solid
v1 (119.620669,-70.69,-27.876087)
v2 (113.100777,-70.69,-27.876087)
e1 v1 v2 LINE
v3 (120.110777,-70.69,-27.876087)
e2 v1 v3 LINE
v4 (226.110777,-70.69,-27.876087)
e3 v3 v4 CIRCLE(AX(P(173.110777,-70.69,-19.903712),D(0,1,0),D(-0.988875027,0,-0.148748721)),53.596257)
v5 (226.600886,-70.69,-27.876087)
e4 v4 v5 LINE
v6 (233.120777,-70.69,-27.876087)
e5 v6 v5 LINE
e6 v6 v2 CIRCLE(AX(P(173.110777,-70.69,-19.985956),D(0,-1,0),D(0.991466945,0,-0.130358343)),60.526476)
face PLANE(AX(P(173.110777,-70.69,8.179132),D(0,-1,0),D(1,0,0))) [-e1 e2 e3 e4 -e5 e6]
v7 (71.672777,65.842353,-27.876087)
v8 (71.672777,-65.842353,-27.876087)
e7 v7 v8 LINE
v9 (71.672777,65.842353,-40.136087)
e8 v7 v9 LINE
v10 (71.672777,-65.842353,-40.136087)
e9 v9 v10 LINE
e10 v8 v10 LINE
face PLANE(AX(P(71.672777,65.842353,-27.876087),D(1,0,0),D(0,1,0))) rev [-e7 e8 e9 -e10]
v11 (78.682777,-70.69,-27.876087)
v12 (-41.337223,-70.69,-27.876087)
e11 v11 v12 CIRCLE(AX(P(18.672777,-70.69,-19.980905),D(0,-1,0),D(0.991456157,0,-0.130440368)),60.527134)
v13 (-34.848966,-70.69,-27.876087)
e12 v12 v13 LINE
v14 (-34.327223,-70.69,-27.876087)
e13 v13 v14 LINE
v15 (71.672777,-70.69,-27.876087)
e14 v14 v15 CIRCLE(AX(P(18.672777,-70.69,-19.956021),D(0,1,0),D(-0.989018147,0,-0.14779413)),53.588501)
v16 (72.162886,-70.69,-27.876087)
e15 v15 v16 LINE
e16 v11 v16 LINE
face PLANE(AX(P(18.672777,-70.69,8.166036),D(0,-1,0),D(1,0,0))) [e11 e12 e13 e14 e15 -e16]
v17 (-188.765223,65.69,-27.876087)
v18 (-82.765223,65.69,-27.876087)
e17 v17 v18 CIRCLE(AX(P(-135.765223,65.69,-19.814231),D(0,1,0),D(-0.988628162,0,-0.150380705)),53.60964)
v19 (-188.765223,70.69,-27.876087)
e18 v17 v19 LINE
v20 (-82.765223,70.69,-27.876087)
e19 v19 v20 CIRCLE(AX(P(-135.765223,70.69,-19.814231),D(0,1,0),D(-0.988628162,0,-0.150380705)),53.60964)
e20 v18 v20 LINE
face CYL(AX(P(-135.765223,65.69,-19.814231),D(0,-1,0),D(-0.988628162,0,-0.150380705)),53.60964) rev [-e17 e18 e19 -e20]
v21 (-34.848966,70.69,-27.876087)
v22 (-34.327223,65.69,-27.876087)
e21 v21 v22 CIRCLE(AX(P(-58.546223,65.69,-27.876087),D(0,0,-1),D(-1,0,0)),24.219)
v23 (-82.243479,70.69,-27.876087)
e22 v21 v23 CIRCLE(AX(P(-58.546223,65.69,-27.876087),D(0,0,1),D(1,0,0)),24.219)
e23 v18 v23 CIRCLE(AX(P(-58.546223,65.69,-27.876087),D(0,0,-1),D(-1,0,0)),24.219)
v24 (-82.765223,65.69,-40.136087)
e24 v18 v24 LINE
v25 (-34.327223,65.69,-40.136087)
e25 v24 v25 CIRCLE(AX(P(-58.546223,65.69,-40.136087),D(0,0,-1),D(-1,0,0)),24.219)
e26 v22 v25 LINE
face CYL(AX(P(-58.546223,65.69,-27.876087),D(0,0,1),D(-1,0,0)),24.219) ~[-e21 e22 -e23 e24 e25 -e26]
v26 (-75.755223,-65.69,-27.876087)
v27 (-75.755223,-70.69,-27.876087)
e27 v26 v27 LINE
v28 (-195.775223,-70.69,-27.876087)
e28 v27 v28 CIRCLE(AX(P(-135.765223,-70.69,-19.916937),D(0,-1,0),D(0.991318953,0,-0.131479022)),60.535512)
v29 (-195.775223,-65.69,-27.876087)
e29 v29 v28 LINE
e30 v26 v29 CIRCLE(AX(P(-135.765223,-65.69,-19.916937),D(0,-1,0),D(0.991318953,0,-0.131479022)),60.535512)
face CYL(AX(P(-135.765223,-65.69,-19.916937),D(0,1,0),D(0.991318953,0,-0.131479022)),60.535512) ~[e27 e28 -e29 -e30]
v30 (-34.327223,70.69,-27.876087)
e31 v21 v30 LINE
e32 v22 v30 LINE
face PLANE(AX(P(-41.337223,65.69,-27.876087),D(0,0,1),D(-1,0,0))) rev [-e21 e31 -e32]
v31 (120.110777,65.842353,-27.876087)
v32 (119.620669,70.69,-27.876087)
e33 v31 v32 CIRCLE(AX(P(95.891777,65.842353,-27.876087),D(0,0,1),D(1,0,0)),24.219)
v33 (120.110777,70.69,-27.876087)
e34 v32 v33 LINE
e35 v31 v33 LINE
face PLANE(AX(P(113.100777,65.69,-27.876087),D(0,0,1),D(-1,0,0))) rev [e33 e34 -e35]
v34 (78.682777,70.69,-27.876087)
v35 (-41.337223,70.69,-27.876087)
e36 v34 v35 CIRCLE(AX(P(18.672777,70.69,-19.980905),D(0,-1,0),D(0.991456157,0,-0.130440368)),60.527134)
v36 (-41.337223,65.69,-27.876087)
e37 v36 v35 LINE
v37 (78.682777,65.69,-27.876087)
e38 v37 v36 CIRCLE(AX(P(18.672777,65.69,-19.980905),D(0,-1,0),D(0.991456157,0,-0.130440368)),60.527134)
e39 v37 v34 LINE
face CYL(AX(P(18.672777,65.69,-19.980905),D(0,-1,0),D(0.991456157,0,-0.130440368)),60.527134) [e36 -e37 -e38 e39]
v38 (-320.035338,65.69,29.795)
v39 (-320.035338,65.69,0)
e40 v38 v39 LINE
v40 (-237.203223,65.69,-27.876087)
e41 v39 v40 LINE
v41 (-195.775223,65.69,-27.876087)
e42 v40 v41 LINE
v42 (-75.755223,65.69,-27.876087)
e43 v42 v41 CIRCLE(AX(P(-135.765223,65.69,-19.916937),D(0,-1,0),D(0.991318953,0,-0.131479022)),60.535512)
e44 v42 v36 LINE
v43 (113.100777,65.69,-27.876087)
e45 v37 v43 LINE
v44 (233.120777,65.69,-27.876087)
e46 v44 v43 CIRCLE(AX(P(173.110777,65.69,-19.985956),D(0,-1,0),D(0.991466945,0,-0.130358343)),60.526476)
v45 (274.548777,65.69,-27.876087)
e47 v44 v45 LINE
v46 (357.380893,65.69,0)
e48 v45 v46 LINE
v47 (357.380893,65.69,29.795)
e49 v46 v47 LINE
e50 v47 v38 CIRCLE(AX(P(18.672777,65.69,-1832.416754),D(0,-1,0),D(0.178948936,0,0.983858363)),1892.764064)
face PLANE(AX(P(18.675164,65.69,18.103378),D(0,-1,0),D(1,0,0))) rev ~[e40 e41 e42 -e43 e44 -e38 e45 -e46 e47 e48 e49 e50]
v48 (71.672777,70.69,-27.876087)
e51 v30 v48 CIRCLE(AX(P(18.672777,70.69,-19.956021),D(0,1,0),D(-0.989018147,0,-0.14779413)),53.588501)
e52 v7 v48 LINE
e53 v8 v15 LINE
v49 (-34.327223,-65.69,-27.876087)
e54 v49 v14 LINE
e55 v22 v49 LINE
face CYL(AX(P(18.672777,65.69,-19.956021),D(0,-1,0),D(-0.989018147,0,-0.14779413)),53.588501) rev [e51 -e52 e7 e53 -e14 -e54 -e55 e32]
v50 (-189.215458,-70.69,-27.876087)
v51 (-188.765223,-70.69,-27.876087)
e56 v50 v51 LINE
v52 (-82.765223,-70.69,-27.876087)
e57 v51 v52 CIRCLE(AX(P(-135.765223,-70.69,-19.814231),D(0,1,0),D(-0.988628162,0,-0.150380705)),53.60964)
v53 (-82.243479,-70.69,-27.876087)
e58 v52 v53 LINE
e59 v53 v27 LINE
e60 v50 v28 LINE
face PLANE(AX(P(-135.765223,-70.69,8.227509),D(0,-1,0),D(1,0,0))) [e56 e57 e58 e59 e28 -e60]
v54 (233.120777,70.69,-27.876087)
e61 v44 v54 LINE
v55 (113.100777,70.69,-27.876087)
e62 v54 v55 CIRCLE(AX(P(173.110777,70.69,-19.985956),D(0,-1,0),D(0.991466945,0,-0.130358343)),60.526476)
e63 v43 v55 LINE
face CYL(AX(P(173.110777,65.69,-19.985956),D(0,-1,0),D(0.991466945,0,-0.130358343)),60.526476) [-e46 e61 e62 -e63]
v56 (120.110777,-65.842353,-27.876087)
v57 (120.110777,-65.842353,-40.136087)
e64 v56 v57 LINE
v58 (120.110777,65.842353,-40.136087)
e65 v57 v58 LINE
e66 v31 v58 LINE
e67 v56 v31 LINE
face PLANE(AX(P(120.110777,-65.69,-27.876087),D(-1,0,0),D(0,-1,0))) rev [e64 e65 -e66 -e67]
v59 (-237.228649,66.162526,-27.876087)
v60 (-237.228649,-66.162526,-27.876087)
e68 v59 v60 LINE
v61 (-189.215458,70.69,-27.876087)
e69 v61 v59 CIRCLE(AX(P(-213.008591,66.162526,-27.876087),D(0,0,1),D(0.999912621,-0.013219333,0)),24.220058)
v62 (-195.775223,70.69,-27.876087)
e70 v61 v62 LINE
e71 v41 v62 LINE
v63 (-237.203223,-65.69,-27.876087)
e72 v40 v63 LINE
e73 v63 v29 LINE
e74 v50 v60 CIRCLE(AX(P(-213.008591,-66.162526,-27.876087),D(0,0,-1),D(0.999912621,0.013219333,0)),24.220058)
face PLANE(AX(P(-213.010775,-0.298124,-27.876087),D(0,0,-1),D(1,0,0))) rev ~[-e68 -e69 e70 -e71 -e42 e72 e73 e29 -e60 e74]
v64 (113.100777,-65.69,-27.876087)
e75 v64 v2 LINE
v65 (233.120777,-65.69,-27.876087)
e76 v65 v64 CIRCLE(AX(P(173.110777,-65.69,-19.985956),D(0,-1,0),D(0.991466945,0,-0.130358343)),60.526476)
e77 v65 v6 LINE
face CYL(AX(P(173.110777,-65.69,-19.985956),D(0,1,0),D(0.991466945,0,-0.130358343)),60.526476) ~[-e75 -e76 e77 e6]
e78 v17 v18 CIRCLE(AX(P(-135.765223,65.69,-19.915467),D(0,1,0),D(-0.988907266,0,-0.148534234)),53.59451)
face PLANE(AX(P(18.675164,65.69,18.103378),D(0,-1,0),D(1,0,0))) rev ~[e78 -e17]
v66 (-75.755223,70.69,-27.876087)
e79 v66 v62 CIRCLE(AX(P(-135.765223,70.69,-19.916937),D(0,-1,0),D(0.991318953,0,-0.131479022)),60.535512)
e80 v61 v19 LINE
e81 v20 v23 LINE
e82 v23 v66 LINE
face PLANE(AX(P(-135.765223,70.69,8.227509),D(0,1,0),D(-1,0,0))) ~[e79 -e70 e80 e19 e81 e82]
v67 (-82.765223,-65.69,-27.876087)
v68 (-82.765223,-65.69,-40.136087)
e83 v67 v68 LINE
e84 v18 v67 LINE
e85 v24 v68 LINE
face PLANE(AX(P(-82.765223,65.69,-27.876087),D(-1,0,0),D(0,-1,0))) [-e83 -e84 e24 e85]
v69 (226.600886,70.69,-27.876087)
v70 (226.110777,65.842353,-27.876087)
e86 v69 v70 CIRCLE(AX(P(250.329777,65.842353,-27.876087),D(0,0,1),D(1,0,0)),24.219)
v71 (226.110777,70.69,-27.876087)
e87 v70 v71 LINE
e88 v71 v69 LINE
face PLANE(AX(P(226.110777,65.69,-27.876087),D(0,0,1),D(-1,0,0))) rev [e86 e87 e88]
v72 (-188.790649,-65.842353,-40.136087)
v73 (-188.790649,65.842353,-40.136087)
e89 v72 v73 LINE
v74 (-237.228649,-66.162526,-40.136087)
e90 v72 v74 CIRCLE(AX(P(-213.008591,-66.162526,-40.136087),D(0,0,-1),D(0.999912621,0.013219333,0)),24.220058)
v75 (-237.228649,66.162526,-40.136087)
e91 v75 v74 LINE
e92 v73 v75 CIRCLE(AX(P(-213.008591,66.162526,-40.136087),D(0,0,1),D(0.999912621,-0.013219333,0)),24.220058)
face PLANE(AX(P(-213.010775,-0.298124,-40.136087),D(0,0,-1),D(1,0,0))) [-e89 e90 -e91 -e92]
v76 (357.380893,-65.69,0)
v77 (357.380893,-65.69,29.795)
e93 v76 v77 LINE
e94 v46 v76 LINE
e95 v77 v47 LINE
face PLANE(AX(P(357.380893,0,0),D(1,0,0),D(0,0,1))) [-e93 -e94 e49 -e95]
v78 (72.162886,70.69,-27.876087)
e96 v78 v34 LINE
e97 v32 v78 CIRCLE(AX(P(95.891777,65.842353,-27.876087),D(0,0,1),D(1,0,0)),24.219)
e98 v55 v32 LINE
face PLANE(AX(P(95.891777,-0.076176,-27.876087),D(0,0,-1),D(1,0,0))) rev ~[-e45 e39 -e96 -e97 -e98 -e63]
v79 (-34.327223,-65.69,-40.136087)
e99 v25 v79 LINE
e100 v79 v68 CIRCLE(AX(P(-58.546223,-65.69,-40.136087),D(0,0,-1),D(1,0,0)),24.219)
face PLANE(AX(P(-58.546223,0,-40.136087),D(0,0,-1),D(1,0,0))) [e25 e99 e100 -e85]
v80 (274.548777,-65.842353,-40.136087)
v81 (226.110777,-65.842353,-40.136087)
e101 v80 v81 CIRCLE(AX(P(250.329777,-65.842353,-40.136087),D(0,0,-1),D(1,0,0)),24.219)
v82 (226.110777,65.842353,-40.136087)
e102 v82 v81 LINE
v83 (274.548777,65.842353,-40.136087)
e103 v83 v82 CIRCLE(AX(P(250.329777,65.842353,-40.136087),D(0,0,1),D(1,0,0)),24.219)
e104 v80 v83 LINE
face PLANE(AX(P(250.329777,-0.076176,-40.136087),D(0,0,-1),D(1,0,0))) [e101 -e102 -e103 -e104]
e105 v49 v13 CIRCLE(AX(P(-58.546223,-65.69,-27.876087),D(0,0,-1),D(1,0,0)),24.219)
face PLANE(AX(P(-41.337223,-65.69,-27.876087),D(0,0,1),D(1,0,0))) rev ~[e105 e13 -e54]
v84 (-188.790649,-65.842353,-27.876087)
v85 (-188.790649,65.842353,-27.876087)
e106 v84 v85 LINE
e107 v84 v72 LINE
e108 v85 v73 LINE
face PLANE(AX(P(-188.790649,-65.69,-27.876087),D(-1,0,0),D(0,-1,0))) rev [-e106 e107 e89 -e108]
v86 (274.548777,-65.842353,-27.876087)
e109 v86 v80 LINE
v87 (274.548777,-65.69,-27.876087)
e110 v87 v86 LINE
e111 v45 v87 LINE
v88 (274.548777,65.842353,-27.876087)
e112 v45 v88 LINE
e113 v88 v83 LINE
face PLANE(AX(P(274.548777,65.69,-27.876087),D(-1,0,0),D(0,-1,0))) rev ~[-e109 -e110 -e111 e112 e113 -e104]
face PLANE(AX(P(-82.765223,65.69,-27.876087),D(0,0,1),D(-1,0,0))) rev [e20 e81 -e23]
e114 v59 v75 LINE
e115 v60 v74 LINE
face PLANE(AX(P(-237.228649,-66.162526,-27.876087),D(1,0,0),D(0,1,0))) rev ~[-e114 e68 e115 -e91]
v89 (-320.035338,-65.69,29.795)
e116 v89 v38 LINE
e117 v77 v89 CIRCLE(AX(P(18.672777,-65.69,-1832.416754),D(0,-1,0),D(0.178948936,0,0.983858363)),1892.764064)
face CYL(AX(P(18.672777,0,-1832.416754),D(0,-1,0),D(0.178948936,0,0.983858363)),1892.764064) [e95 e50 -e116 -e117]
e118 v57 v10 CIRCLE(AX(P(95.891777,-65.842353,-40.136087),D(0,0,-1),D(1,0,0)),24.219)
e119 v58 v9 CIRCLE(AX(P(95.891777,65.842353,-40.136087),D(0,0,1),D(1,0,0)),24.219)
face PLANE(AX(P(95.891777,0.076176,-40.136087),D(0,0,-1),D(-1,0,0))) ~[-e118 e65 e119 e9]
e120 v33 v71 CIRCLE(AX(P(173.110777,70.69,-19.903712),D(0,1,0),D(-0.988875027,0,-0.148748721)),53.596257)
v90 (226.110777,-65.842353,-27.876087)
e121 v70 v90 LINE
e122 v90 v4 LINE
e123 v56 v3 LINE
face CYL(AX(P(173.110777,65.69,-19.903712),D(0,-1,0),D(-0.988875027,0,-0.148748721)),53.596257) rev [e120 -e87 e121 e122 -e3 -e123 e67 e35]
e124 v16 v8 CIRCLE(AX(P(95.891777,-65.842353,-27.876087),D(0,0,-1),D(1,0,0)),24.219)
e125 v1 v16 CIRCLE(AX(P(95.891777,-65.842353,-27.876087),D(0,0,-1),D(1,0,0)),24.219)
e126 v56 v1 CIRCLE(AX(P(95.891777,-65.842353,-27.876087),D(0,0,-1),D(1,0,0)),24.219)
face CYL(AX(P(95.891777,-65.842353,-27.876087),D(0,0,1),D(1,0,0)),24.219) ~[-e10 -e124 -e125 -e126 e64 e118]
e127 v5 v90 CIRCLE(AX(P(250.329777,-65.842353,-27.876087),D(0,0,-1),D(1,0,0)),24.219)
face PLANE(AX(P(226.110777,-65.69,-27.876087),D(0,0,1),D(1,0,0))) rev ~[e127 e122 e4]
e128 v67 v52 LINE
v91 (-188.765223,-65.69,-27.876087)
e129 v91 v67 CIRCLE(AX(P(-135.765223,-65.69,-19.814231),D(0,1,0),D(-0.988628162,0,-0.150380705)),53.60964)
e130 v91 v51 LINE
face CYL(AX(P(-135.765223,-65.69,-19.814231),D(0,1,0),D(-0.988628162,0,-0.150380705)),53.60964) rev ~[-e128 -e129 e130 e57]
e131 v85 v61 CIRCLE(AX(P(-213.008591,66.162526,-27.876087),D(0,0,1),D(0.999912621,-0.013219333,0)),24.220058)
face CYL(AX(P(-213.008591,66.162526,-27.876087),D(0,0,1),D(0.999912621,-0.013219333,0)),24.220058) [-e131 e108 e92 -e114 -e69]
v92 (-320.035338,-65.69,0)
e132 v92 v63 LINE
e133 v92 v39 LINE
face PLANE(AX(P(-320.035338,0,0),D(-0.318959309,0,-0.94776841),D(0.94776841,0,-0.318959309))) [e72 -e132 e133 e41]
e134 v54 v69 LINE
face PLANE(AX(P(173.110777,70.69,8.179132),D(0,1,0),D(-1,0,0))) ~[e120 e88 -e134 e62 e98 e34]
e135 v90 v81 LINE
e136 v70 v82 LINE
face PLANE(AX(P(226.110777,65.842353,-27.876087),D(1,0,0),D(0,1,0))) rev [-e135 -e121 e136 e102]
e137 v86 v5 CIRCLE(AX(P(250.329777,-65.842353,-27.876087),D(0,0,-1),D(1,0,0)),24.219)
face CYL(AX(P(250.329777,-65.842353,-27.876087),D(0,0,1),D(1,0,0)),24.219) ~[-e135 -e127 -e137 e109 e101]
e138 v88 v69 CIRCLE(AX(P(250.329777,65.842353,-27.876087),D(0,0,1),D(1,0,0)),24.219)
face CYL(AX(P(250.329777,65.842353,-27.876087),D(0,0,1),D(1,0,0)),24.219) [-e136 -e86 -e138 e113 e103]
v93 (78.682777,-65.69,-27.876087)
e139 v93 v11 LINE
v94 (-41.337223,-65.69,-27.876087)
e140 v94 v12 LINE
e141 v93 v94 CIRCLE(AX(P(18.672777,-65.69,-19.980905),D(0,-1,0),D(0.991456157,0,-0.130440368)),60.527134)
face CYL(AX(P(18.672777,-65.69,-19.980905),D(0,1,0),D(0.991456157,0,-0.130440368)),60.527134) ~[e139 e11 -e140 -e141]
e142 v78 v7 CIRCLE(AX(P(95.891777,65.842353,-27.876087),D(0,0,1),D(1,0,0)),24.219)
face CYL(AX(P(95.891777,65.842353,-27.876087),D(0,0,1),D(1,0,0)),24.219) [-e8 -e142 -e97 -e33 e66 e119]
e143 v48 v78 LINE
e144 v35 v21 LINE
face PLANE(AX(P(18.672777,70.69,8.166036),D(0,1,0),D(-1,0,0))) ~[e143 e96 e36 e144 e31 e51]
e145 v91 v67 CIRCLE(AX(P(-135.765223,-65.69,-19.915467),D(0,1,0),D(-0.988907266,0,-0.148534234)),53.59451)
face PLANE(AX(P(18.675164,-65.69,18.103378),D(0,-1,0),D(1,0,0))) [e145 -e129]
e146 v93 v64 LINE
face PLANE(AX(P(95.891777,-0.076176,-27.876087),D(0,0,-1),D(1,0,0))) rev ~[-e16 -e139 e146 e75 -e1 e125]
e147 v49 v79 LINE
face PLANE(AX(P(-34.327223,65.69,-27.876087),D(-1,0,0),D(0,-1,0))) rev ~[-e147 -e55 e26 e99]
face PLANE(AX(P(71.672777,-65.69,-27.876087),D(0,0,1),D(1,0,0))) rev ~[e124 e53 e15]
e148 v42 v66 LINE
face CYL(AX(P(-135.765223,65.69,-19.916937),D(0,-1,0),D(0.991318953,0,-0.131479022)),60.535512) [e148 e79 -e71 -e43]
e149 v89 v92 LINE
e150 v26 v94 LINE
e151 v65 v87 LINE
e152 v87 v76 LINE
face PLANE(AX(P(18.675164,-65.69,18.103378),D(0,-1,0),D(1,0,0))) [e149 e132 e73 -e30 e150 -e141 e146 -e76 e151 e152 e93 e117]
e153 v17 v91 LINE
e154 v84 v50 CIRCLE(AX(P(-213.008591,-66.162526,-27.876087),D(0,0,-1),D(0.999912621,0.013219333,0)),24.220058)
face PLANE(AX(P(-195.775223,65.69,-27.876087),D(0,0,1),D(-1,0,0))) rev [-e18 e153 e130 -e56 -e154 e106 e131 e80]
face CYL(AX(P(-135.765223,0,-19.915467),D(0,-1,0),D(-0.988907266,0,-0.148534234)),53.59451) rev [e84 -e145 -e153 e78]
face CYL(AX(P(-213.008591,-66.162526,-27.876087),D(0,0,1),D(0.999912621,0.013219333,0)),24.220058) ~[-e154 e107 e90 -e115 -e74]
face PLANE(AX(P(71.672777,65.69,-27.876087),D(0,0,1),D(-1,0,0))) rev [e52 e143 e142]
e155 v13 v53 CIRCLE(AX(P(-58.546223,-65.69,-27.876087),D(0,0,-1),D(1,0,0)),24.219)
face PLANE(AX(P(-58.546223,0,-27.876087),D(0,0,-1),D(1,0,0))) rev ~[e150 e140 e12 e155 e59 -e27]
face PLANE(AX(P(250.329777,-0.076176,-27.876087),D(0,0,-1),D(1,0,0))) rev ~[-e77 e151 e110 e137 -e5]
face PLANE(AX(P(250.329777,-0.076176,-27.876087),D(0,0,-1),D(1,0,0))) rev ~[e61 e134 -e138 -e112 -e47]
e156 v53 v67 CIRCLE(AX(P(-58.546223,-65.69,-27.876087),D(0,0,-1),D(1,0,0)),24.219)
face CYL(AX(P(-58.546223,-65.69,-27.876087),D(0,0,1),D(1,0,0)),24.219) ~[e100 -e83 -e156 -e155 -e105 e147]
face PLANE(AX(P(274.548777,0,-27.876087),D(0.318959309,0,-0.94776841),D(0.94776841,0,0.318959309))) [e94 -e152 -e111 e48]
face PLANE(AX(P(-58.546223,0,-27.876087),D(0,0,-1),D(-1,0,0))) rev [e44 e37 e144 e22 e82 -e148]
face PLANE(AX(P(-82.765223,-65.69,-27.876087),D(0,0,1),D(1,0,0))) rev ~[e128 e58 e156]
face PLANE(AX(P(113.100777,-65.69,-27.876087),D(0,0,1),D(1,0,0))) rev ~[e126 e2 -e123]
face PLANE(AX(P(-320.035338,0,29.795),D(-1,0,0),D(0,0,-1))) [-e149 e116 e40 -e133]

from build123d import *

# Parameters (mm, degrees)
F1_DEPTH = 65.69
F2_W     = 48.438
F2_H     = 131.38
F3_DEPTH = 12.26
F5_DEPTH = 5


# Not quite as in the source:
# - a feature names something its author has since deleted; it is built from what else it names


with BuildPart() as f1:
    # F0 (on Front) → F1 (new body, symmetric)
    with BuildSketch(Plane.XZ):
        with BuildLine():
            Line((-320.0353384018, 0), (-237.2032226722, -27.8760867547))
            Line((-237.2032226722, -27.8760867547), (-188.7652226722, -27.8760867547))
            ThreePointArc((-188.7652226722, -27.8760867547), (-135.7652226722, 33.6790422812), (-82.7652226722, -27.8760867547))
            Line((-82.7652226722, -27.8760867547), (-34.3272226722, -27.8760867547))
            ThreePointArc((-34.3272226722, -27.8760867547), (18.6727773278, 33.6324801702), (71.6727773278, -27.8760867547))
            Line((71.6727773278, -27.8760867547), (120.1107773278, -27.8760867547))
            ThreePointArc((120.1107773278, -27.8760867547), (173.1107773278, 33.6925448374), (226.1107773278, -27.8760867547))
            Line((226.1107773278, -27.8760867547), (274.5487773278, -27.8760867547))
            Line((274.5487773278, -27.8760867547), (357.3808930574, 0))
            Line((357.3808930574, 0), (357.3808930574, 29.795))
            ThreePointArc((357.3808930574, 29.795), (18.6727773278, 60.3473106454), (-320.0353384018, 29.795))
            Line((-320.0353384018, 29.795), (-320.0353384018, 0))
        make_face()
    extrude(amount=F1_DEPTH, both=True)

    # F2 (on face) → F3 (join)
    with BuildSketch(Plane(origin=(0, 0, -27.8760867547), x_dir=(1, 0, 0), z_dir=(0, 0, -1))):
        with BuildLine():
            ThreePointArc((-237.2286491756, -65.5376471925), (-213.0855863574, -89.7567669916), (-188.7906491756, -65.69))
            Line((-188.7906491756, -65.69), (-188.7906491756, 65.8423528075))
            ThreePointArc((-188.7906491756, 65.8423528075), (-212.8485010036, 90.3820549045), (-237.2286491756, 66.1625258279))
            Line((-237.2286491756, 66.1625258279), (-237.2286491756, -65.5376471925))
        make_face()
        with Locations((-58.5462226722, 0)):
            Rectangle(F2_W, F2_H)
        with BuildLine():
            Line((71.6727773278, 65.8423528075), (71.6727773278, -65.69))
            ThreePointArc((71.6727773278, -65.69), (95.8917773278, -89.909), (120.1107773278, -65.69))
            Line((120.1107773278, -65.69), (120.1107773278, 65.8423528075))
            ThreePointArc((120.1107773278, 65.8423528075), (95.8917773278, 90.0613528075), (71.6727773278, 65.8423528075))
        make_face()
        with BuildLine():
            Line((226.1107773278, 65.8423528075), (226.1107773278, -65.69))
            ThreePointArc((226.1107773278, -65.69), (250.3297773278, -89.909), (274.5487773278, -65.69))
            Line((274.5487773278, -65.69), (274.5487773278, 65.8423528075))
            ThreePointArc((274.5487773278, 65.8423528075), (250.3297773278, 90.0613528075), (226.1107773278, 65.8423528075))
        make_face()
        with BuildLine():
            Line((-34.3272226722, -65.69), (-82.7652226722, -65.69))
            ThreePointArc((-82.7652226722, -65.69), (-58.5462226722, -89.909), (-34.3272226722, -65.69))
        make_face()
        with BuildLine():
            ThreePointArc((-34.3272226722, 65.69), (-58.5462226722, 89.909), (-82.7652226722, 65.69))
            Line((-82.7652226722, 65.69), (-34.3272226722, 65.69))
        make_face()
    extrude(amount=F3_DEPTH)

    # F4 (on face) → F5 (join)
    with BuildSketch(Plane.XZ.offset(65.69)):
        with BuildLine():
            ThreePointArc((78.6827773278, -27.8760867547), (18.6727773278, 40.5462292936), (-41.3372226722, -27.8760867547))
            Line((-41.3372226722, -27.8760867547), (-34.3272226722, -27.8760867547))
            ThreePointArc((-34.3272226722, -27.8760867547), (18.6727773278, 33.6324801702), (71.6727773278, -27.8760867547))
            Line((71.6727773278, -27.8760867547), (78.6827773278, -27.8760867547))
        make_face()
        with BuildLine():
            ThreePointArc((233.1207773278, -27.8760867547), (173.1107773278, 40.5405201313), (113.1007773278, -27.8760867547))
            Line((113.1007773278, -27.8760867547), (120.1107773278, -27.8760867547))
            ThreePointArc((120.1107773278, -27.8760867547), (173.1107773278, 33.6925448374), (226.1107773278, -27.8760867547))
            Line((226.1107773278, -27.8760867547), (233.1207773278, -27.8760867547))
        make_face()
        with BuildLine():
            ThreePointArc((-188.7652226722, -27.8760867547), (-135.7652226722, 33.7954088447), (-82.7652226722, -27.8760867547))
            Line((-82.7652226722, -27.8760867547), (-75.7552226722, -27.8760867547))
            ThreePointArc((-75.7552226722, -27.8760867547), (-135.7652226722, 40.6185747484), (-195.7752226722, -27.8760867547))
            Line((-195.7752226722, -27.8760867547), (-188.7906491756, -27.8760867547))
            Line((-188.7906491756, -27.8760867547), (-188.7652226722, -27.8760867547))
        make_face()
    extrude(amount=F5_DEPTH)

    # F6: F1 across plane


with BuildPart() as f1_1:
    add(f1.part)
    add(f1.part.mirror(Plane.XZ))


solid = f1_1.part
